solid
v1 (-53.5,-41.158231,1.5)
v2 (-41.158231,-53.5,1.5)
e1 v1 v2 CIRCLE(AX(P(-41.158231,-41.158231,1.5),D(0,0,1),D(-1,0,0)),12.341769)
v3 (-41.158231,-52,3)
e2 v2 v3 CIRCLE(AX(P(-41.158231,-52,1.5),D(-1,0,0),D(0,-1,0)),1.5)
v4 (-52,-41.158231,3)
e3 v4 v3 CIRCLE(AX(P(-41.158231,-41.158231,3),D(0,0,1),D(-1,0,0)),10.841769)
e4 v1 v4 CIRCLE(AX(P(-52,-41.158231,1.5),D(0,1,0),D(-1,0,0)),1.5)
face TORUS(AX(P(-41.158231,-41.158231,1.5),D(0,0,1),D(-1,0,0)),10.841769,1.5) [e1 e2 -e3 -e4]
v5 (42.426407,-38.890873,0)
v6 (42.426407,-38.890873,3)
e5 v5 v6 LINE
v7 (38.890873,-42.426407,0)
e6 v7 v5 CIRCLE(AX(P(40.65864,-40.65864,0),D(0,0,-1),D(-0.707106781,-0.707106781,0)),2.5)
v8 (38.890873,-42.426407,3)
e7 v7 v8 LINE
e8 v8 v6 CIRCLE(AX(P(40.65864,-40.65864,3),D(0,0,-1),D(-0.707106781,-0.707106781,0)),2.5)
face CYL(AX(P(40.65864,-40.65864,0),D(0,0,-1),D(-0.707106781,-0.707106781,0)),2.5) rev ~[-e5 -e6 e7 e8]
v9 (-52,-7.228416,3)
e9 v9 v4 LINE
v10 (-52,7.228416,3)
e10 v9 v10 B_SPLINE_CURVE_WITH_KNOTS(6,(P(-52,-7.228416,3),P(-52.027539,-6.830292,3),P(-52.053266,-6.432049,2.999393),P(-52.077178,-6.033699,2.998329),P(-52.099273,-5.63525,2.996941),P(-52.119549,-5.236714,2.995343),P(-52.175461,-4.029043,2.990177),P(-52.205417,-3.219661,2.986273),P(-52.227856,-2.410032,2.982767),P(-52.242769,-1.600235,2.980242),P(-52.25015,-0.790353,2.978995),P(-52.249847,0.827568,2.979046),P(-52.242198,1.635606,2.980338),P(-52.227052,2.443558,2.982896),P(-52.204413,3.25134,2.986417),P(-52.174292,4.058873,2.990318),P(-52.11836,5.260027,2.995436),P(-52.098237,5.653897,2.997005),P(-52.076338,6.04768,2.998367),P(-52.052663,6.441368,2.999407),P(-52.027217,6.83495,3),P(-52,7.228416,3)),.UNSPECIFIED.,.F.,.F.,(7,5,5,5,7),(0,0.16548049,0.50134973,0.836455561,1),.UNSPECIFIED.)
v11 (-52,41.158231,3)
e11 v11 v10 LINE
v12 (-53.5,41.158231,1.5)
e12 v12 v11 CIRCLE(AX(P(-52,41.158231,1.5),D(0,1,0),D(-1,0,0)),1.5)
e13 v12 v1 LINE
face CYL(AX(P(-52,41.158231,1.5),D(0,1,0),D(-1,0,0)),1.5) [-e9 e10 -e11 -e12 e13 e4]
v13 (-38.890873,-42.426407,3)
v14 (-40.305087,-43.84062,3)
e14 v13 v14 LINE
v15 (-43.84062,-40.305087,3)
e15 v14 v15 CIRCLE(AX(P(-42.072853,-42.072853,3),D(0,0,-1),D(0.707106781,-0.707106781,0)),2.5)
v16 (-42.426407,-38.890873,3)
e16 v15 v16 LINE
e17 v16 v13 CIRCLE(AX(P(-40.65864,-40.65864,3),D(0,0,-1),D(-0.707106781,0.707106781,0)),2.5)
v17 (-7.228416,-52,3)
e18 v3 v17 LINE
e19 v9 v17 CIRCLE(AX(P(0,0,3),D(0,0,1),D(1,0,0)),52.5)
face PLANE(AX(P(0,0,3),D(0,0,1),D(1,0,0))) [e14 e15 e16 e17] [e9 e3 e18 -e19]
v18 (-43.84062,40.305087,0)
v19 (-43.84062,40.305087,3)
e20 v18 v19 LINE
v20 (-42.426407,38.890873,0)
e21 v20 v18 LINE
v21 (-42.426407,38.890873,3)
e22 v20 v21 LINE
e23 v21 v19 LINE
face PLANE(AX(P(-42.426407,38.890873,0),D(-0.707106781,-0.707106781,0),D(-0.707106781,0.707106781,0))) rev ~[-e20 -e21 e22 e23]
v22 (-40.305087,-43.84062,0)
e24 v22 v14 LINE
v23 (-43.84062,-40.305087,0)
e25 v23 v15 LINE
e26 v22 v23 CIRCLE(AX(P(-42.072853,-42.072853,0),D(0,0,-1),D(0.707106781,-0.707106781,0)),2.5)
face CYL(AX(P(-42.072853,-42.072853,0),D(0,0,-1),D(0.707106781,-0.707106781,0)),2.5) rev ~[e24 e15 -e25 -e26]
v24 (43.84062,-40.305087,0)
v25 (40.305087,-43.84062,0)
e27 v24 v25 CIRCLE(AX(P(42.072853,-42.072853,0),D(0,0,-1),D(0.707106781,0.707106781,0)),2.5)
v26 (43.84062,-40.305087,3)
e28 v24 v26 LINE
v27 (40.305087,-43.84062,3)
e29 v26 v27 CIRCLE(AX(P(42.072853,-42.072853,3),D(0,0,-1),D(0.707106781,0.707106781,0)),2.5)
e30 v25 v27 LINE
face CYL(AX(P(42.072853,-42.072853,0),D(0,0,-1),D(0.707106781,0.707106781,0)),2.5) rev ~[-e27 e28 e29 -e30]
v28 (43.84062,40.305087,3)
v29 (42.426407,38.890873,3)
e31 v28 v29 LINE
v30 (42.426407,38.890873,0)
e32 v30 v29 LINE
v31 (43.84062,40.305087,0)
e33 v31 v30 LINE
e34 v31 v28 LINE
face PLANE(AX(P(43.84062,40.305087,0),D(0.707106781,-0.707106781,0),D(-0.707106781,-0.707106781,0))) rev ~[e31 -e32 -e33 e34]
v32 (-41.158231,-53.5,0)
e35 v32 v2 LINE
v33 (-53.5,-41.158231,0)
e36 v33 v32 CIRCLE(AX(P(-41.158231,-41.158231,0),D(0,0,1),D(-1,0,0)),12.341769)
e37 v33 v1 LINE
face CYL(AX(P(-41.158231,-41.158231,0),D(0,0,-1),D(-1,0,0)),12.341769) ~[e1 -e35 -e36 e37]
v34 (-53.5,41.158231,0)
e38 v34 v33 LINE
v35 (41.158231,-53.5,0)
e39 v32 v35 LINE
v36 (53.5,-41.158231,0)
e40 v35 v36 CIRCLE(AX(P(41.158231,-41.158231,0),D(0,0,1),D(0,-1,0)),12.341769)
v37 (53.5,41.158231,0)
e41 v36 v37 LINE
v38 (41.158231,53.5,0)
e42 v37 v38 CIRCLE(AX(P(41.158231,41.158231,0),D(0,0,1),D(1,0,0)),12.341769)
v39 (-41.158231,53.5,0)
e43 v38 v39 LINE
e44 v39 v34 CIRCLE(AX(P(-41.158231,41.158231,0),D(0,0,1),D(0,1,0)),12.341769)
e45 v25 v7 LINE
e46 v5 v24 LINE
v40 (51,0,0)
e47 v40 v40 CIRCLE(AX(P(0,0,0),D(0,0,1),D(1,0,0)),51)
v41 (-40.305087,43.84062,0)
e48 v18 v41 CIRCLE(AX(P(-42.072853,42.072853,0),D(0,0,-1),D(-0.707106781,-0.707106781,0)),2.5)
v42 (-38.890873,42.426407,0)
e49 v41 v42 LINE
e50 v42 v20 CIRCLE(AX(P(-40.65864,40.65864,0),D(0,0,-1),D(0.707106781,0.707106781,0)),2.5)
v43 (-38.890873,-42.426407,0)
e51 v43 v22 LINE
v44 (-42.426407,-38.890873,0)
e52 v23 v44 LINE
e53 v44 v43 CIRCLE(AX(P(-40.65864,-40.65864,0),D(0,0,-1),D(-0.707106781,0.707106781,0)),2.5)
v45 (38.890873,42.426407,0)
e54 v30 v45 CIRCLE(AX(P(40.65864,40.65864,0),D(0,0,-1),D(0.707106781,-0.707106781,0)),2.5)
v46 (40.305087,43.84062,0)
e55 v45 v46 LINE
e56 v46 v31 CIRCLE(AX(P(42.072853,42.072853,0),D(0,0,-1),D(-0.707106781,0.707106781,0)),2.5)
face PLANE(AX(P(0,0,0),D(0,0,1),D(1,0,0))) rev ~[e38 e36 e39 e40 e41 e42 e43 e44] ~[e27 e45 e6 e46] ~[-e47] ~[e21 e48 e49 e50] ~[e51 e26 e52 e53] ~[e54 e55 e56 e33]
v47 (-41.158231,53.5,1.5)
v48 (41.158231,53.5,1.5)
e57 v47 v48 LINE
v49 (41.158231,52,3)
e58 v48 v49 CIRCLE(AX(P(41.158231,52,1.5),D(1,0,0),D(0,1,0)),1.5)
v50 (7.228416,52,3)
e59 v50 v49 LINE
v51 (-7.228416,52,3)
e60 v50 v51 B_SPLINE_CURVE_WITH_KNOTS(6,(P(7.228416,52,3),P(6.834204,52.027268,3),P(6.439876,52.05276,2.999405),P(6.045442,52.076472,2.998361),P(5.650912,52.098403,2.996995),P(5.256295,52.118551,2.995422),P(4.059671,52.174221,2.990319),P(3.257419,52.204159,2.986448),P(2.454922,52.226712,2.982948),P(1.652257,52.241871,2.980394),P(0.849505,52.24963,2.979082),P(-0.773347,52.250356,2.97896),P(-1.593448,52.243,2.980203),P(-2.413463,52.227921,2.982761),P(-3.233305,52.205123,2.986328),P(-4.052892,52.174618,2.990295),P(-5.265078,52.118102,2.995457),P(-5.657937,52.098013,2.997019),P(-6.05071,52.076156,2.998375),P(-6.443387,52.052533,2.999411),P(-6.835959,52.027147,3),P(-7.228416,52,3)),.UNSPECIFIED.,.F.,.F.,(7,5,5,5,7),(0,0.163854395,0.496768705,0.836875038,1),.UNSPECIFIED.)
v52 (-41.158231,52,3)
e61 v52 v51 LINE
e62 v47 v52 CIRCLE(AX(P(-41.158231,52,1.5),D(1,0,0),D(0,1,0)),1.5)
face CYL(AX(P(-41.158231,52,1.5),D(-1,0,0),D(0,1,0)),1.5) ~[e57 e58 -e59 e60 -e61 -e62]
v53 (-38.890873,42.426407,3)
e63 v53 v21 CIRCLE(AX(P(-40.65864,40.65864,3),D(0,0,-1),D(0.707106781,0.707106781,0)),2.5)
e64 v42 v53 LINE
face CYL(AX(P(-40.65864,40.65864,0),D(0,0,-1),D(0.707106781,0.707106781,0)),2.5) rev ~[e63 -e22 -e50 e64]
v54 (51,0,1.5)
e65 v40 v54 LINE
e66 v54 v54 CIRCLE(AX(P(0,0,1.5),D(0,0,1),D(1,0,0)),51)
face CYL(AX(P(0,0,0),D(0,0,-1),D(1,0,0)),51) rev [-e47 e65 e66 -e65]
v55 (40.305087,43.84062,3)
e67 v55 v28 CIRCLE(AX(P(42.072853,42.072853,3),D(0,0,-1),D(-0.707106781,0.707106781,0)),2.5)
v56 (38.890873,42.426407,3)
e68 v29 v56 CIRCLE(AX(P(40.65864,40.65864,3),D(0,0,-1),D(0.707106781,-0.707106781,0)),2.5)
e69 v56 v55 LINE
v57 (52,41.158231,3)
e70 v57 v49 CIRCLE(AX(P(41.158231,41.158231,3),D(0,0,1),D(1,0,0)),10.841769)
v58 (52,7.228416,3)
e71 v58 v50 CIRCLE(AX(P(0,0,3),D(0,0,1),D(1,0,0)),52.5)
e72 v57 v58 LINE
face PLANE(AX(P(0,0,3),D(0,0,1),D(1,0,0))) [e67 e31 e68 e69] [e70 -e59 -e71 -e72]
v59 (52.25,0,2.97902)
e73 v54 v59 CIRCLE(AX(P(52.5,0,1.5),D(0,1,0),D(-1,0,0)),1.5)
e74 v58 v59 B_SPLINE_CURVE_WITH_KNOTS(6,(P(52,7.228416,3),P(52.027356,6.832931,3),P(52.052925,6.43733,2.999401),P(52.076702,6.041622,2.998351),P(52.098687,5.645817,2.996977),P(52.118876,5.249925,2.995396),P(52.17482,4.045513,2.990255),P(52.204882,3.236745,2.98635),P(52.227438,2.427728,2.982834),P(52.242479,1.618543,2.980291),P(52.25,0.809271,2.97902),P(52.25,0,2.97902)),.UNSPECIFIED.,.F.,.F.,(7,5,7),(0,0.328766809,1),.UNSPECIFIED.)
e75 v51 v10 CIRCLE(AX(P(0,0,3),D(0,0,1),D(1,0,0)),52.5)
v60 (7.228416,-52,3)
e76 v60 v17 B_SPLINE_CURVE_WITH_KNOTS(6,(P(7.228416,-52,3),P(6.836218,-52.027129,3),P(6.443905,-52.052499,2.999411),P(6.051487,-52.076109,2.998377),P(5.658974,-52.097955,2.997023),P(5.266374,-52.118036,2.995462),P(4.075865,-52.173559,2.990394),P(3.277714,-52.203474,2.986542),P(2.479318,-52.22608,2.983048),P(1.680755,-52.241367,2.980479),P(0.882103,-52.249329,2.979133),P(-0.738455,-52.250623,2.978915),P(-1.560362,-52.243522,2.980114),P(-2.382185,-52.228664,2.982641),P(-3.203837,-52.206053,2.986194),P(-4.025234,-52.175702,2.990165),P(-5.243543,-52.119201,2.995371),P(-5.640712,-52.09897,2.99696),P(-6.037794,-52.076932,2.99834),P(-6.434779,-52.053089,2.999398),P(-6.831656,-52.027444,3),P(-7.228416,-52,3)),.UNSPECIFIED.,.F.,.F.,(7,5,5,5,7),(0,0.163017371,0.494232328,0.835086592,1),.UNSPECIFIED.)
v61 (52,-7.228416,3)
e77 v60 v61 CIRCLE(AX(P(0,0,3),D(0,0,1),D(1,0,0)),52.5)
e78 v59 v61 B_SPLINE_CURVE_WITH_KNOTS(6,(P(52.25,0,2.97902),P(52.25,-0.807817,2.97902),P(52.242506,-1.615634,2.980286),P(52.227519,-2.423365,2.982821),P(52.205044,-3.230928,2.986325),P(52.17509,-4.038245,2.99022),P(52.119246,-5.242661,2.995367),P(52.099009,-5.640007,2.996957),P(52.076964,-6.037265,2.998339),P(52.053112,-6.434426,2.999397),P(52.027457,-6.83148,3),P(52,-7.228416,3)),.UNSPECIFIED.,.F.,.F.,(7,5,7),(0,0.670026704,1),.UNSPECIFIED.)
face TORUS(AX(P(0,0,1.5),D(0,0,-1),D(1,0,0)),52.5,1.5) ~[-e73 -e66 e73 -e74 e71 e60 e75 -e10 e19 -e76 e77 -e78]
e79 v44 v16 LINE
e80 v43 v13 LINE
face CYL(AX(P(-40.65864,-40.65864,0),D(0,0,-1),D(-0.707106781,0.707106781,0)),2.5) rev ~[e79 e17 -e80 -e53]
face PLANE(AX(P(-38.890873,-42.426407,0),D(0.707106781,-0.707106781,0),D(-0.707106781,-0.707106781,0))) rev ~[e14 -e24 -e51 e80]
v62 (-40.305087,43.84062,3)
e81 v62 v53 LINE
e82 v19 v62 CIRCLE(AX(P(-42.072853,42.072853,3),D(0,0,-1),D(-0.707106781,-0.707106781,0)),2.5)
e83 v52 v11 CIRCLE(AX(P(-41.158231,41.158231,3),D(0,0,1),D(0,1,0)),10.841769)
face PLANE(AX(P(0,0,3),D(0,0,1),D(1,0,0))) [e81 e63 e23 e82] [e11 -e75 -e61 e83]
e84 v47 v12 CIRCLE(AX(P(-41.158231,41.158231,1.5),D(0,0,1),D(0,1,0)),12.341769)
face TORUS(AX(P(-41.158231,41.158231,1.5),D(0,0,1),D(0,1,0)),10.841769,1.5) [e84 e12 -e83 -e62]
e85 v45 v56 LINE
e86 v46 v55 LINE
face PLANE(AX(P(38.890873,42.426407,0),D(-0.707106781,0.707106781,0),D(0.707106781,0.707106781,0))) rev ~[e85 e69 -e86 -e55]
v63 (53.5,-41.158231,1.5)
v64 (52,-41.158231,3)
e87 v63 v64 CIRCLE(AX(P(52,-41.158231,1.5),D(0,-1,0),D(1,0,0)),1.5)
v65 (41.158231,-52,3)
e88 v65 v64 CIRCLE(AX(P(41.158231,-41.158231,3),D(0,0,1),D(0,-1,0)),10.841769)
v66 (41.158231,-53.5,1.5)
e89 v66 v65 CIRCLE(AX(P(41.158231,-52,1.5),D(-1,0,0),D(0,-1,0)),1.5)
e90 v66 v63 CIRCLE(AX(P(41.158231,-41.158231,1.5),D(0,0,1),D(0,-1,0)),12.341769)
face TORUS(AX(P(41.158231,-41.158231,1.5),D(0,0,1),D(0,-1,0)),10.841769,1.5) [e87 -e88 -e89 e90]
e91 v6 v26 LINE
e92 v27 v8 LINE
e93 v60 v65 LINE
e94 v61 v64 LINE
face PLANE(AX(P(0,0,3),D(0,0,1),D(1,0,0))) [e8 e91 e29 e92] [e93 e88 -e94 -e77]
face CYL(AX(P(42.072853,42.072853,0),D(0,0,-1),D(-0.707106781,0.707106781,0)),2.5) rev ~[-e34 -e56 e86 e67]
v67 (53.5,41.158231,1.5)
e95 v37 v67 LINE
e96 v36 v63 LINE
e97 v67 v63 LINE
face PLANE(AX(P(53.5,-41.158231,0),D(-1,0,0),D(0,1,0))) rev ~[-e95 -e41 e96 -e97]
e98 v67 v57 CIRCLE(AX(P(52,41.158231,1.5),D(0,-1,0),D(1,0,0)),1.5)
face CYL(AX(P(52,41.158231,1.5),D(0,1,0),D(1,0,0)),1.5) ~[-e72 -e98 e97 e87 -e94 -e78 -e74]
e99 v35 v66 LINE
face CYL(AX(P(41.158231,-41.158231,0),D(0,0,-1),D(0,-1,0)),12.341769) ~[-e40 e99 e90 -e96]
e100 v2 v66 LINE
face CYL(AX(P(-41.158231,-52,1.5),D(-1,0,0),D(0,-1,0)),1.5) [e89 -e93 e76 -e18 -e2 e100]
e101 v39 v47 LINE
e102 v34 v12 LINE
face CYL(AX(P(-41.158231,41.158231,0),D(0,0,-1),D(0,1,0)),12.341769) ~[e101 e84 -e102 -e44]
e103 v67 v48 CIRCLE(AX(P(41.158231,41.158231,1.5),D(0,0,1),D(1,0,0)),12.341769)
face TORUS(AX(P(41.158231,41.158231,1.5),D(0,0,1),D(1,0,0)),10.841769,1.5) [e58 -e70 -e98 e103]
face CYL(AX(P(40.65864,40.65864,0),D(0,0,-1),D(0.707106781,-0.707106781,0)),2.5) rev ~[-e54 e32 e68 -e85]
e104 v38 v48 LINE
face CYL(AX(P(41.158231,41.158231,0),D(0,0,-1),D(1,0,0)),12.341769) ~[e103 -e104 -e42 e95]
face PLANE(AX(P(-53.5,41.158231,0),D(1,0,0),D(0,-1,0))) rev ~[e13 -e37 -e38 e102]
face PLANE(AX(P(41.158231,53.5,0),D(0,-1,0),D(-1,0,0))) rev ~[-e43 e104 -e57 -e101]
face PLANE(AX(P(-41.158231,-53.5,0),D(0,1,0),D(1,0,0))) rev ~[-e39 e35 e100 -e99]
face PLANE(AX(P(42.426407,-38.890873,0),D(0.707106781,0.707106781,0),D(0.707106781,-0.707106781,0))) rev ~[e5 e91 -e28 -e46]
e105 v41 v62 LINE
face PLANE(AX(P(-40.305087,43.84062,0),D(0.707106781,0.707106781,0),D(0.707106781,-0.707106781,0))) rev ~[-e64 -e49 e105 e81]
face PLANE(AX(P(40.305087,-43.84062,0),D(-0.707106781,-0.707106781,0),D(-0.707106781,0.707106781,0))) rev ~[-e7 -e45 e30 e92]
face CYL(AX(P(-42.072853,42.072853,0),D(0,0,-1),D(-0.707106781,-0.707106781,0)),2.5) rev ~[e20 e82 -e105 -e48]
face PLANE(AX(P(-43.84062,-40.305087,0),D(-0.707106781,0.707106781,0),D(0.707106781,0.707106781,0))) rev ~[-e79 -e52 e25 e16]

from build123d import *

# Parameters (mm, degrees)
F0_R         = 51
F1_DEPTH     = 3
F2_T1_DEPTH  = 82.316462509
F2_T3_DEPTH  = 82.316462509
F2_T6_ANGLE  = 90
F2_T8_ANGLE  = 90
F2_T10_ANGLE = 90
F2_T12_ANGLE = 90


# Not quite as in the source:
# - a fillet or chamfer that OpenCascade refuses, or shapes differently, is made with other operations: its cross-section is extruded or revolved along the edge and cut away or added


with BuildPart() as f1:
    # F0 (on Top) → F1 (new body)
    with BuildSketch(Plane.XY):
        with BuildLine():
            Line((41.1582312545, 53.5), (-41.1582312545, 53.5))
            ThreePointArc((-41.1582312545, 53.5), (-49.8851796263, 49.8851796263), (-53.5, 41.1582312545))
            Line((-53.5, 41.1582312545), (-53.5, -41.1582312545))
            ThreePointArc((-53.5, -41.1582312545), (-49.8851796263, -49.8851796263), (-41.1582312545, -53.5))
            Line((-41.1582312545, -53.5), (41.1582312545, -53.5))
            ThreePointArc((41.1582312545, -53.5), (49.8851796263, -49.8851796263), (53.5, -41.1582312545))
            Line((53.5, -41.1582312545), (53.5, 41.1582312545))
            ThreePointArc((53.5, 41.1582312545), (49.8851796263, 49.8851796263), (41.1582312545, 53.5))
        make_face()
        with BuildLine():
            ThreePointArc((-40.3050865276, -43.8406204336), (-43.8406204336, -43.8406204336), (-43.8406204336, -40.3050865276))
            Line((-43.8406204336, -40.3050865276), (-42.4264068712, -38.8908729653))
            ThreePointArc((-42.4264068712, -38.8908729653), (-38.8908729653, -38.8908729653), (-38.8908729653, -42.4264068712))
            Line((-38.8908729653, -42.4264068712), (-40.3050865276, -43.8406204336))
        make_face(mode=Mode.SUBTRACT)
        Circle(F0_R, mode=Mode.SUBTRACT)
        with BuildLine():
            ThreePointArc((43.8406204336, -40.3050865276), (43.8406204336, -43.8406204336), (40.3050865276, -43.8406204336))
            Line((40.3050865276, -43.8406204336), (38.8908729653, -42.4264068712))
            ThreePointArc((38.8908729653, -42.4264068712), (38.8908729653, -38.8908729653), (42.4264068712, -38.8908729653))
            Line((42.4264068712, -38.8908729653), (43.8406204336, -40.3050865276))
        make_face(mode=Mode.SUBTRACT)
        with BuildLine():
            ThreePointArc((-43.8406204336, 40.3050865276), (-43.8406204336, 43.8406204336), (-40.3050865276, 43.8406204336))
            Line((-40.3050865276, 43.8406204336), (-38.8908729653, 42.4264068712))
            ThreePointArc((-38.8908729653, 42.4264068712), (-38.8908729653, 38.8908729653), (-42.4264068712, 38.8908729653))
            Line((-42.4264068712, 38.8908729653), (-43.8406204336, 40.3050865276))
        make_face(mode=Mode.SUBTRACT)
        with BuildLine():
            ThreePointArc((40.3050865276, 43.8406204336), (43.8406204336, 43.8406204336), (43.8406204336, 40.3050865276))
            Line((43.8406204336, 40.3050865276), (42.4264068712, 38.8908729653))
            ThreePointArc((42.4264068712, 38.8908729653), (38.8908729653, 38.8908729653), (38.8908729653, 42.4264068712))
            Line((38.8908729653, 42.4264068712), (40.3050865276, 43.8406204336))
        make_face(mode=Mode.SUBTRACT)
    extrude(amount=F1_DEPTH)

    # F2: fillet of radius 1.5 on 8 edges, made by hand

    # F2_s2 → F2_t1 (cut)
    with BuildSketch(Plane.XZ.offset(-41.1582312545)):
        with BuildLine():
            ThreePointArc((-53.5, 1.5), (-53.0606601718, 2.5606601718), (-52, 3))
            Line((-52, 3), (-53.5, 3))
            Line((-53.5, 3), (-53.5, 1.5))
        make_face()
        with BuildLine():
            ThreePointArc((53.5, 1.5), (53.0606601718, 2.5606601718), (52, 3))
            Line((52, 3), (53.5, 3))
            Line((53.5, 3), (53.5, 1.5))
        make_face()
    extrude(amount=F2_T1_DEPTH, mode=Mode.SUBTRACT)

    # F2_s4 → F2_t3 (cut)
    with BuildSketch(Plane.YZ.offset(-41.1582312545)):
        with BuildLine():
            ThreePointArc((53.5, 1.5), (53.0606601718, 2.5606601718), (52, 3))
            Line((52, 3), (53.5, 3))
            Line((53.5, 3), (53.5, 1.5))
        make_face()
        with BuildLine():
            ThreePointArc((-53.5, 1.5), (-53.0606601718, 2.5606601718), (-52, 3))
            Line((-52, 3), (-53.5, 3))
            Line((-53.5, 3), (-53.5, 1.5))
        make_face()
    extrude(amount=F2_T3_DEPTH, mode=Mode.SUBTRACT)

    # F2_s5 → F2_t6 (revolve, cut)
    with BuildSketch(Plane.YZ.offset(-41.1582312545)):
        with BuildLine():
            ThreePointArc((53.5, 1.5), (53.0606601718, 2.5606601718), (52, 3))
            Line((52, 3), (53.5, 3))
            Line((53.5, 3), (53.5, 1.5))
        make_face()
    revolve(axis=Axis((-41.1582312545, 41.1582312545, 3), (0, 0, 1)), revolution_arc=F2_T6_ANGLE, mode=Mode.SUBTRACT)

    # F2_s7 → F2_t8 (revolve, cut)
    with BuildSketch(Plane.XZ.offset(-41.1582312545)):
        with BuildLine():
            ThreePointArc((53.5, 1.5), (53.0606601718, 2.5606601718), (52, 3))
            Line((52, 3), (53.5, 3))
            Line((53.5, 3), (53.5, 1.5))
        make_face()
    revolve(axis=Axis((41.1582312545, 41.1582312545, 3), (0, 0, 1)), revolution_arc=F2_T8_ANGLE, mode=Mode.SUBTRACT)

    # F2_s9 → F2_t10 (revolve, cut)
    with BuildSketch(Plane.XZ.offset(41.1582312545)):
        with BuildLine():
            ThreePointArc((-53.5, 1.5), (-53.0606601718, 2.5606601718), (-52, 3))
            Line((-52, 3), (-53.5, 3))
            Line((-53.5, 3), (-53.5, 1.5))
        make_face()
    revolve(axis=Axis((-41.1582312545, -41.1582312545, 3), (0, 0, 1)), revolution_arc=F2_T10_ANGLE, mode=Mode.SUBTRACT)

    # F2_s11 → F2_t12 (revolve, cut)
    with BuildSketch(Plane.YZ.offset(41.1582312545)):
        with BuildLine():
            ThreePointArc((-53.5, 1.5), (-53.0606601718, 2.5606601718), (-52, 3))
            Line((-52, 3), (-53.5, 3))
            Line((-53.5, 3), (-53.5, 1.5))
        make_face()
    revolve(axis=Axis((41.1582312545, -41.1582312545, 3), (0, 0, 1)), revolution_arc=F2_T12_ANGLE, mode=Mode.SUBTRACT)

    # F2_s13 → F2_t14 (revolve, cut)
    with BuildSketch(Plane.XZ):
        with BuildLine():
            ThreePointArc((51, 1.5), (51.4393398282, 2.5606601718), (52.5, 3))
            Line((52.5, 3), (51, 3))
            Line((51, 3), (51, 1.5))
        make_face()
    revolve(axis=Axis((0, 0, 3), (0, 0, 1)), mode=Mode.SUBTRACT)


solid = f1.part
